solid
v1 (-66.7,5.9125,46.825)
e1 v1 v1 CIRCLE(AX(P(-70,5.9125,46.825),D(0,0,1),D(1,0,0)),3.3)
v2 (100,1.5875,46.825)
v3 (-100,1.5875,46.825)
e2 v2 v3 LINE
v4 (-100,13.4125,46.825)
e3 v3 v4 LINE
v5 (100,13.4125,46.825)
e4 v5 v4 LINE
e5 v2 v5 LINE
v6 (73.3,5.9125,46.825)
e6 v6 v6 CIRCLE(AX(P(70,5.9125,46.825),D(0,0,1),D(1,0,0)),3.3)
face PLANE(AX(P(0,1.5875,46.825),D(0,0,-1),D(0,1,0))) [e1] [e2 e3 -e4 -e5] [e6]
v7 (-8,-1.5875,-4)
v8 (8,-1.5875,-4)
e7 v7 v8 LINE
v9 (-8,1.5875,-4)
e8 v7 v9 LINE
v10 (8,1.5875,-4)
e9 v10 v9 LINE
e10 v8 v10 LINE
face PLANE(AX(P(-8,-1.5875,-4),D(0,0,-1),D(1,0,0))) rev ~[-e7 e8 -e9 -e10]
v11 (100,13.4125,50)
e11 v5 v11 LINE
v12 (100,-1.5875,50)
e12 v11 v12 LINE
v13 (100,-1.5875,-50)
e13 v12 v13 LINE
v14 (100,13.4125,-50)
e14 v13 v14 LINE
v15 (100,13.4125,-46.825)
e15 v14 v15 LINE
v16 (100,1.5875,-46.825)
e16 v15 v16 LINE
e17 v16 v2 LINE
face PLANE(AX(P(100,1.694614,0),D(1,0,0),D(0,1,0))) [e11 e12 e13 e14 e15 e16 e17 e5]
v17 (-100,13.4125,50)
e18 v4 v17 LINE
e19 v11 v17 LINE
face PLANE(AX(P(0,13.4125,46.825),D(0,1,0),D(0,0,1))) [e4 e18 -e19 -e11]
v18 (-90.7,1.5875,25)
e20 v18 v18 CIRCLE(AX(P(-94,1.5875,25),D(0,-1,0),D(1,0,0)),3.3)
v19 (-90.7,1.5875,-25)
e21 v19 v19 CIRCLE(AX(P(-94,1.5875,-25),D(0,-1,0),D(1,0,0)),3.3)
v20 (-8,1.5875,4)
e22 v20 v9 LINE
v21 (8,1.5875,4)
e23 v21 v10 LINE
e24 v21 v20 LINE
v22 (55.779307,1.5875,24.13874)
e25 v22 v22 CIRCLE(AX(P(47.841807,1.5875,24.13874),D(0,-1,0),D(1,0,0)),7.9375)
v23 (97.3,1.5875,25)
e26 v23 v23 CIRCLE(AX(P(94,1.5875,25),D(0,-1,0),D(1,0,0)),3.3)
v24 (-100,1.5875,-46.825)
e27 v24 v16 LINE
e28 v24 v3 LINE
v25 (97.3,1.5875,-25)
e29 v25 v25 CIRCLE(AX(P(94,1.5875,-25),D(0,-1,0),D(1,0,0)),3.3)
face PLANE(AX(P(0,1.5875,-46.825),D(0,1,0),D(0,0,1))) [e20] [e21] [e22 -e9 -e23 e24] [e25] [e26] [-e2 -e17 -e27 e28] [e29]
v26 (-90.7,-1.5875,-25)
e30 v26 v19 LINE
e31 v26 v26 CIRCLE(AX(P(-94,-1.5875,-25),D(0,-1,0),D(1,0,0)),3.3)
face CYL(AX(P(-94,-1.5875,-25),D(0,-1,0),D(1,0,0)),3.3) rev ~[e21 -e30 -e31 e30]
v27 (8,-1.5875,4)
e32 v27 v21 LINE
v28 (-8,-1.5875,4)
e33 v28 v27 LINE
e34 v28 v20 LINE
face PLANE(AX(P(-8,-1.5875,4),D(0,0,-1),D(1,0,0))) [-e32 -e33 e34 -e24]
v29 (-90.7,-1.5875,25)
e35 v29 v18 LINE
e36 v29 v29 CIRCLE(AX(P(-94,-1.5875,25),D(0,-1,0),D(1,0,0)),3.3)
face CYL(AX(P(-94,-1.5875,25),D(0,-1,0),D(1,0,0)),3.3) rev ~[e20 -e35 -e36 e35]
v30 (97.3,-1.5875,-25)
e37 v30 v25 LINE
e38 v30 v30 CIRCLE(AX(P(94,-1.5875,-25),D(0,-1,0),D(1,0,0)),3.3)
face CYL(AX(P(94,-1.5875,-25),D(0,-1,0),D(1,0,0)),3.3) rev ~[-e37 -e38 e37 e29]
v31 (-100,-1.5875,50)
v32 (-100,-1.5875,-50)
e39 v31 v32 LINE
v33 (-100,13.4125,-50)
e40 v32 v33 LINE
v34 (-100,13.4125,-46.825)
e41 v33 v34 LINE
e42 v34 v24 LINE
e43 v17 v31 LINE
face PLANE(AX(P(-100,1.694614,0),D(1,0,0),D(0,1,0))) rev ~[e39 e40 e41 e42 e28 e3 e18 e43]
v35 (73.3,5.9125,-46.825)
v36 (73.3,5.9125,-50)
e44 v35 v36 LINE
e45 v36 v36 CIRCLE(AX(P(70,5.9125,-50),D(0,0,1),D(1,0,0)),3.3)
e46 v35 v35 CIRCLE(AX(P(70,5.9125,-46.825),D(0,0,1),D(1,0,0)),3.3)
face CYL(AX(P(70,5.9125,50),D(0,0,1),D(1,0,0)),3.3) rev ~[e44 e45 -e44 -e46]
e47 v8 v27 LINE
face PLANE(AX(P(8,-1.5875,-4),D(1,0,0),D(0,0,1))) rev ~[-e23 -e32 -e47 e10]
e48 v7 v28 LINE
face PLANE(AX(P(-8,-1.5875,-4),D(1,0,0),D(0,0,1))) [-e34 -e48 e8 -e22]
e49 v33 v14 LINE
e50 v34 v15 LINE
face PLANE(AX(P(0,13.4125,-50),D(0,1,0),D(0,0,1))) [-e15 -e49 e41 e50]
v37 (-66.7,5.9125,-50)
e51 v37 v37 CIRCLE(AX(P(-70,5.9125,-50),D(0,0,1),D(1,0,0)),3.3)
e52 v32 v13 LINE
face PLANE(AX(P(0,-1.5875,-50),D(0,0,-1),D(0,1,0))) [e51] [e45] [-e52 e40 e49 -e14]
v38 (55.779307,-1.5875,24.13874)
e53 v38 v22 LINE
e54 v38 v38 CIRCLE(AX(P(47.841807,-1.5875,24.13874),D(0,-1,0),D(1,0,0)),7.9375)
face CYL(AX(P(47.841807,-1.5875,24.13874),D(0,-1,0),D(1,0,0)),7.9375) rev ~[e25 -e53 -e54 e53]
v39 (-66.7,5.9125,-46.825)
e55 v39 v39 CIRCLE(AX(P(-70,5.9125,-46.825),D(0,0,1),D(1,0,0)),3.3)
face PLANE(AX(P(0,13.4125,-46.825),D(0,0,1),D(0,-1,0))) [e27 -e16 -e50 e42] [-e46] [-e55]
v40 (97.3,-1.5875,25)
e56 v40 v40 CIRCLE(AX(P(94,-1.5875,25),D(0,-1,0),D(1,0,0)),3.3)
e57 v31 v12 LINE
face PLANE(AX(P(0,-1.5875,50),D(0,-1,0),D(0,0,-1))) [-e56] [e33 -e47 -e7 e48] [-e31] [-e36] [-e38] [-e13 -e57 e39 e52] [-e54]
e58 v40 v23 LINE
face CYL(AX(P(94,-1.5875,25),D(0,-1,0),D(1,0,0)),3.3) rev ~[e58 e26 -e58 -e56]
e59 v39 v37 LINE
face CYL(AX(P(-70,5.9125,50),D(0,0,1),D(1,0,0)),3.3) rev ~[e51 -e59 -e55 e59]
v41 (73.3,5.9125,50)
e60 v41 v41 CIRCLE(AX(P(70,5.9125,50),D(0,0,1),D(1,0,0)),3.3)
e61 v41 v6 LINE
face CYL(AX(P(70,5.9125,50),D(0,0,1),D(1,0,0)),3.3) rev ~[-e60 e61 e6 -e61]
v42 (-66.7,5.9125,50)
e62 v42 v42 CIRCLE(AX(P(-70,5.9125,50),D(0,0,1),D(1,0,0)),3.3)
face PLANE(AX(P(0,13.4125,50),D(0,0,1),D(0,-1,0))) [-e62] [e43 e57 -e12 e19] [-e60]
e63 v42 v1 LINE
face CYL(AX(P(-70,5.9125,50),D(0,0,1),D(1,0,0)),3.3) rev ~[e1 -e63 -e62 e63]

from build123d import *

# Parameters (mm, degrees)
F1_DEPTH      = 100
F2_W          = 16
F2_H          = 8
F2_R          = 3.3
F3_DEPTH      = 228
F3_DEPTH_BACK = 15.001
F4_R          = 3.3
F5_DEPTH      = 100.001
F6_R          = 7.9375
F7_DEPTH      = 15.001


# Not quite as in the source:
# - an extrude ends at something that could not be found from the text; its depth is read off the source's solid


with BuildPart() as f1:
    # F0 (on Right) → F1 (new body, symmetric)
    with BuildSketch(Plane.YZ):
        Polygon((13.4125, 50), (1.5875, 50), (-1.5875, 50), (-1.5875, 46.825), (-1.5875, -46.825), (-1.5875, -50), (1.5875, -50), (13.4125, -50), (13.4125, -46.825), (1.5875, -46.825), (1.5875, 46.825), (13.4125, 46.825), align=None)
    extrude(amount=F1_DEPTH, both=True)

    # F2 (on face) → F3 (cut, two sides)
    with BuildSketch(Plane.XZ.offset(1.5875)) as f3_sk:
        Rectangle(F2_W, F2_H)
        with Locations((94, -25)):
            Circle(F2_R)
        with Locations((94, 25)):
            Circle(F2_R)
        with Locations((-94, -25)):
            Circle(F2_R)
        with Locations((-94, 25)):
            Circle(F2_R)
    extrude(amount=F3_DEPTH, mode=Mode.SUBTRACT)
    extrude(f3_sk.sketch, amount=-F3_DEPTH_BACK, mode=Mode.SUBTRACT)

    # F4 (on face) → F5 (cut, through all)
    with BuildSketch(Plane.XY.offset(50)):
        with Locations((-70, 5.9125)):
            Circle(F4_R)
        with Locations((70, 5.9125)):
            Circle(F4_R)
    extrude(amount=-F5_DEPTH, mode=Mode.SUBTRACT)

    # F6 (on face) → F7 (cut, through all)
    with BuildSketch(Plane.XZ.offset(1.5875)):
        with Locations((47.8418069781, 24.1387402225)):
            Circle(F6_R)
    extrude(amount=-F7_DEPTH, mode=Mode.SUBTRACT)


solid = f1.part
